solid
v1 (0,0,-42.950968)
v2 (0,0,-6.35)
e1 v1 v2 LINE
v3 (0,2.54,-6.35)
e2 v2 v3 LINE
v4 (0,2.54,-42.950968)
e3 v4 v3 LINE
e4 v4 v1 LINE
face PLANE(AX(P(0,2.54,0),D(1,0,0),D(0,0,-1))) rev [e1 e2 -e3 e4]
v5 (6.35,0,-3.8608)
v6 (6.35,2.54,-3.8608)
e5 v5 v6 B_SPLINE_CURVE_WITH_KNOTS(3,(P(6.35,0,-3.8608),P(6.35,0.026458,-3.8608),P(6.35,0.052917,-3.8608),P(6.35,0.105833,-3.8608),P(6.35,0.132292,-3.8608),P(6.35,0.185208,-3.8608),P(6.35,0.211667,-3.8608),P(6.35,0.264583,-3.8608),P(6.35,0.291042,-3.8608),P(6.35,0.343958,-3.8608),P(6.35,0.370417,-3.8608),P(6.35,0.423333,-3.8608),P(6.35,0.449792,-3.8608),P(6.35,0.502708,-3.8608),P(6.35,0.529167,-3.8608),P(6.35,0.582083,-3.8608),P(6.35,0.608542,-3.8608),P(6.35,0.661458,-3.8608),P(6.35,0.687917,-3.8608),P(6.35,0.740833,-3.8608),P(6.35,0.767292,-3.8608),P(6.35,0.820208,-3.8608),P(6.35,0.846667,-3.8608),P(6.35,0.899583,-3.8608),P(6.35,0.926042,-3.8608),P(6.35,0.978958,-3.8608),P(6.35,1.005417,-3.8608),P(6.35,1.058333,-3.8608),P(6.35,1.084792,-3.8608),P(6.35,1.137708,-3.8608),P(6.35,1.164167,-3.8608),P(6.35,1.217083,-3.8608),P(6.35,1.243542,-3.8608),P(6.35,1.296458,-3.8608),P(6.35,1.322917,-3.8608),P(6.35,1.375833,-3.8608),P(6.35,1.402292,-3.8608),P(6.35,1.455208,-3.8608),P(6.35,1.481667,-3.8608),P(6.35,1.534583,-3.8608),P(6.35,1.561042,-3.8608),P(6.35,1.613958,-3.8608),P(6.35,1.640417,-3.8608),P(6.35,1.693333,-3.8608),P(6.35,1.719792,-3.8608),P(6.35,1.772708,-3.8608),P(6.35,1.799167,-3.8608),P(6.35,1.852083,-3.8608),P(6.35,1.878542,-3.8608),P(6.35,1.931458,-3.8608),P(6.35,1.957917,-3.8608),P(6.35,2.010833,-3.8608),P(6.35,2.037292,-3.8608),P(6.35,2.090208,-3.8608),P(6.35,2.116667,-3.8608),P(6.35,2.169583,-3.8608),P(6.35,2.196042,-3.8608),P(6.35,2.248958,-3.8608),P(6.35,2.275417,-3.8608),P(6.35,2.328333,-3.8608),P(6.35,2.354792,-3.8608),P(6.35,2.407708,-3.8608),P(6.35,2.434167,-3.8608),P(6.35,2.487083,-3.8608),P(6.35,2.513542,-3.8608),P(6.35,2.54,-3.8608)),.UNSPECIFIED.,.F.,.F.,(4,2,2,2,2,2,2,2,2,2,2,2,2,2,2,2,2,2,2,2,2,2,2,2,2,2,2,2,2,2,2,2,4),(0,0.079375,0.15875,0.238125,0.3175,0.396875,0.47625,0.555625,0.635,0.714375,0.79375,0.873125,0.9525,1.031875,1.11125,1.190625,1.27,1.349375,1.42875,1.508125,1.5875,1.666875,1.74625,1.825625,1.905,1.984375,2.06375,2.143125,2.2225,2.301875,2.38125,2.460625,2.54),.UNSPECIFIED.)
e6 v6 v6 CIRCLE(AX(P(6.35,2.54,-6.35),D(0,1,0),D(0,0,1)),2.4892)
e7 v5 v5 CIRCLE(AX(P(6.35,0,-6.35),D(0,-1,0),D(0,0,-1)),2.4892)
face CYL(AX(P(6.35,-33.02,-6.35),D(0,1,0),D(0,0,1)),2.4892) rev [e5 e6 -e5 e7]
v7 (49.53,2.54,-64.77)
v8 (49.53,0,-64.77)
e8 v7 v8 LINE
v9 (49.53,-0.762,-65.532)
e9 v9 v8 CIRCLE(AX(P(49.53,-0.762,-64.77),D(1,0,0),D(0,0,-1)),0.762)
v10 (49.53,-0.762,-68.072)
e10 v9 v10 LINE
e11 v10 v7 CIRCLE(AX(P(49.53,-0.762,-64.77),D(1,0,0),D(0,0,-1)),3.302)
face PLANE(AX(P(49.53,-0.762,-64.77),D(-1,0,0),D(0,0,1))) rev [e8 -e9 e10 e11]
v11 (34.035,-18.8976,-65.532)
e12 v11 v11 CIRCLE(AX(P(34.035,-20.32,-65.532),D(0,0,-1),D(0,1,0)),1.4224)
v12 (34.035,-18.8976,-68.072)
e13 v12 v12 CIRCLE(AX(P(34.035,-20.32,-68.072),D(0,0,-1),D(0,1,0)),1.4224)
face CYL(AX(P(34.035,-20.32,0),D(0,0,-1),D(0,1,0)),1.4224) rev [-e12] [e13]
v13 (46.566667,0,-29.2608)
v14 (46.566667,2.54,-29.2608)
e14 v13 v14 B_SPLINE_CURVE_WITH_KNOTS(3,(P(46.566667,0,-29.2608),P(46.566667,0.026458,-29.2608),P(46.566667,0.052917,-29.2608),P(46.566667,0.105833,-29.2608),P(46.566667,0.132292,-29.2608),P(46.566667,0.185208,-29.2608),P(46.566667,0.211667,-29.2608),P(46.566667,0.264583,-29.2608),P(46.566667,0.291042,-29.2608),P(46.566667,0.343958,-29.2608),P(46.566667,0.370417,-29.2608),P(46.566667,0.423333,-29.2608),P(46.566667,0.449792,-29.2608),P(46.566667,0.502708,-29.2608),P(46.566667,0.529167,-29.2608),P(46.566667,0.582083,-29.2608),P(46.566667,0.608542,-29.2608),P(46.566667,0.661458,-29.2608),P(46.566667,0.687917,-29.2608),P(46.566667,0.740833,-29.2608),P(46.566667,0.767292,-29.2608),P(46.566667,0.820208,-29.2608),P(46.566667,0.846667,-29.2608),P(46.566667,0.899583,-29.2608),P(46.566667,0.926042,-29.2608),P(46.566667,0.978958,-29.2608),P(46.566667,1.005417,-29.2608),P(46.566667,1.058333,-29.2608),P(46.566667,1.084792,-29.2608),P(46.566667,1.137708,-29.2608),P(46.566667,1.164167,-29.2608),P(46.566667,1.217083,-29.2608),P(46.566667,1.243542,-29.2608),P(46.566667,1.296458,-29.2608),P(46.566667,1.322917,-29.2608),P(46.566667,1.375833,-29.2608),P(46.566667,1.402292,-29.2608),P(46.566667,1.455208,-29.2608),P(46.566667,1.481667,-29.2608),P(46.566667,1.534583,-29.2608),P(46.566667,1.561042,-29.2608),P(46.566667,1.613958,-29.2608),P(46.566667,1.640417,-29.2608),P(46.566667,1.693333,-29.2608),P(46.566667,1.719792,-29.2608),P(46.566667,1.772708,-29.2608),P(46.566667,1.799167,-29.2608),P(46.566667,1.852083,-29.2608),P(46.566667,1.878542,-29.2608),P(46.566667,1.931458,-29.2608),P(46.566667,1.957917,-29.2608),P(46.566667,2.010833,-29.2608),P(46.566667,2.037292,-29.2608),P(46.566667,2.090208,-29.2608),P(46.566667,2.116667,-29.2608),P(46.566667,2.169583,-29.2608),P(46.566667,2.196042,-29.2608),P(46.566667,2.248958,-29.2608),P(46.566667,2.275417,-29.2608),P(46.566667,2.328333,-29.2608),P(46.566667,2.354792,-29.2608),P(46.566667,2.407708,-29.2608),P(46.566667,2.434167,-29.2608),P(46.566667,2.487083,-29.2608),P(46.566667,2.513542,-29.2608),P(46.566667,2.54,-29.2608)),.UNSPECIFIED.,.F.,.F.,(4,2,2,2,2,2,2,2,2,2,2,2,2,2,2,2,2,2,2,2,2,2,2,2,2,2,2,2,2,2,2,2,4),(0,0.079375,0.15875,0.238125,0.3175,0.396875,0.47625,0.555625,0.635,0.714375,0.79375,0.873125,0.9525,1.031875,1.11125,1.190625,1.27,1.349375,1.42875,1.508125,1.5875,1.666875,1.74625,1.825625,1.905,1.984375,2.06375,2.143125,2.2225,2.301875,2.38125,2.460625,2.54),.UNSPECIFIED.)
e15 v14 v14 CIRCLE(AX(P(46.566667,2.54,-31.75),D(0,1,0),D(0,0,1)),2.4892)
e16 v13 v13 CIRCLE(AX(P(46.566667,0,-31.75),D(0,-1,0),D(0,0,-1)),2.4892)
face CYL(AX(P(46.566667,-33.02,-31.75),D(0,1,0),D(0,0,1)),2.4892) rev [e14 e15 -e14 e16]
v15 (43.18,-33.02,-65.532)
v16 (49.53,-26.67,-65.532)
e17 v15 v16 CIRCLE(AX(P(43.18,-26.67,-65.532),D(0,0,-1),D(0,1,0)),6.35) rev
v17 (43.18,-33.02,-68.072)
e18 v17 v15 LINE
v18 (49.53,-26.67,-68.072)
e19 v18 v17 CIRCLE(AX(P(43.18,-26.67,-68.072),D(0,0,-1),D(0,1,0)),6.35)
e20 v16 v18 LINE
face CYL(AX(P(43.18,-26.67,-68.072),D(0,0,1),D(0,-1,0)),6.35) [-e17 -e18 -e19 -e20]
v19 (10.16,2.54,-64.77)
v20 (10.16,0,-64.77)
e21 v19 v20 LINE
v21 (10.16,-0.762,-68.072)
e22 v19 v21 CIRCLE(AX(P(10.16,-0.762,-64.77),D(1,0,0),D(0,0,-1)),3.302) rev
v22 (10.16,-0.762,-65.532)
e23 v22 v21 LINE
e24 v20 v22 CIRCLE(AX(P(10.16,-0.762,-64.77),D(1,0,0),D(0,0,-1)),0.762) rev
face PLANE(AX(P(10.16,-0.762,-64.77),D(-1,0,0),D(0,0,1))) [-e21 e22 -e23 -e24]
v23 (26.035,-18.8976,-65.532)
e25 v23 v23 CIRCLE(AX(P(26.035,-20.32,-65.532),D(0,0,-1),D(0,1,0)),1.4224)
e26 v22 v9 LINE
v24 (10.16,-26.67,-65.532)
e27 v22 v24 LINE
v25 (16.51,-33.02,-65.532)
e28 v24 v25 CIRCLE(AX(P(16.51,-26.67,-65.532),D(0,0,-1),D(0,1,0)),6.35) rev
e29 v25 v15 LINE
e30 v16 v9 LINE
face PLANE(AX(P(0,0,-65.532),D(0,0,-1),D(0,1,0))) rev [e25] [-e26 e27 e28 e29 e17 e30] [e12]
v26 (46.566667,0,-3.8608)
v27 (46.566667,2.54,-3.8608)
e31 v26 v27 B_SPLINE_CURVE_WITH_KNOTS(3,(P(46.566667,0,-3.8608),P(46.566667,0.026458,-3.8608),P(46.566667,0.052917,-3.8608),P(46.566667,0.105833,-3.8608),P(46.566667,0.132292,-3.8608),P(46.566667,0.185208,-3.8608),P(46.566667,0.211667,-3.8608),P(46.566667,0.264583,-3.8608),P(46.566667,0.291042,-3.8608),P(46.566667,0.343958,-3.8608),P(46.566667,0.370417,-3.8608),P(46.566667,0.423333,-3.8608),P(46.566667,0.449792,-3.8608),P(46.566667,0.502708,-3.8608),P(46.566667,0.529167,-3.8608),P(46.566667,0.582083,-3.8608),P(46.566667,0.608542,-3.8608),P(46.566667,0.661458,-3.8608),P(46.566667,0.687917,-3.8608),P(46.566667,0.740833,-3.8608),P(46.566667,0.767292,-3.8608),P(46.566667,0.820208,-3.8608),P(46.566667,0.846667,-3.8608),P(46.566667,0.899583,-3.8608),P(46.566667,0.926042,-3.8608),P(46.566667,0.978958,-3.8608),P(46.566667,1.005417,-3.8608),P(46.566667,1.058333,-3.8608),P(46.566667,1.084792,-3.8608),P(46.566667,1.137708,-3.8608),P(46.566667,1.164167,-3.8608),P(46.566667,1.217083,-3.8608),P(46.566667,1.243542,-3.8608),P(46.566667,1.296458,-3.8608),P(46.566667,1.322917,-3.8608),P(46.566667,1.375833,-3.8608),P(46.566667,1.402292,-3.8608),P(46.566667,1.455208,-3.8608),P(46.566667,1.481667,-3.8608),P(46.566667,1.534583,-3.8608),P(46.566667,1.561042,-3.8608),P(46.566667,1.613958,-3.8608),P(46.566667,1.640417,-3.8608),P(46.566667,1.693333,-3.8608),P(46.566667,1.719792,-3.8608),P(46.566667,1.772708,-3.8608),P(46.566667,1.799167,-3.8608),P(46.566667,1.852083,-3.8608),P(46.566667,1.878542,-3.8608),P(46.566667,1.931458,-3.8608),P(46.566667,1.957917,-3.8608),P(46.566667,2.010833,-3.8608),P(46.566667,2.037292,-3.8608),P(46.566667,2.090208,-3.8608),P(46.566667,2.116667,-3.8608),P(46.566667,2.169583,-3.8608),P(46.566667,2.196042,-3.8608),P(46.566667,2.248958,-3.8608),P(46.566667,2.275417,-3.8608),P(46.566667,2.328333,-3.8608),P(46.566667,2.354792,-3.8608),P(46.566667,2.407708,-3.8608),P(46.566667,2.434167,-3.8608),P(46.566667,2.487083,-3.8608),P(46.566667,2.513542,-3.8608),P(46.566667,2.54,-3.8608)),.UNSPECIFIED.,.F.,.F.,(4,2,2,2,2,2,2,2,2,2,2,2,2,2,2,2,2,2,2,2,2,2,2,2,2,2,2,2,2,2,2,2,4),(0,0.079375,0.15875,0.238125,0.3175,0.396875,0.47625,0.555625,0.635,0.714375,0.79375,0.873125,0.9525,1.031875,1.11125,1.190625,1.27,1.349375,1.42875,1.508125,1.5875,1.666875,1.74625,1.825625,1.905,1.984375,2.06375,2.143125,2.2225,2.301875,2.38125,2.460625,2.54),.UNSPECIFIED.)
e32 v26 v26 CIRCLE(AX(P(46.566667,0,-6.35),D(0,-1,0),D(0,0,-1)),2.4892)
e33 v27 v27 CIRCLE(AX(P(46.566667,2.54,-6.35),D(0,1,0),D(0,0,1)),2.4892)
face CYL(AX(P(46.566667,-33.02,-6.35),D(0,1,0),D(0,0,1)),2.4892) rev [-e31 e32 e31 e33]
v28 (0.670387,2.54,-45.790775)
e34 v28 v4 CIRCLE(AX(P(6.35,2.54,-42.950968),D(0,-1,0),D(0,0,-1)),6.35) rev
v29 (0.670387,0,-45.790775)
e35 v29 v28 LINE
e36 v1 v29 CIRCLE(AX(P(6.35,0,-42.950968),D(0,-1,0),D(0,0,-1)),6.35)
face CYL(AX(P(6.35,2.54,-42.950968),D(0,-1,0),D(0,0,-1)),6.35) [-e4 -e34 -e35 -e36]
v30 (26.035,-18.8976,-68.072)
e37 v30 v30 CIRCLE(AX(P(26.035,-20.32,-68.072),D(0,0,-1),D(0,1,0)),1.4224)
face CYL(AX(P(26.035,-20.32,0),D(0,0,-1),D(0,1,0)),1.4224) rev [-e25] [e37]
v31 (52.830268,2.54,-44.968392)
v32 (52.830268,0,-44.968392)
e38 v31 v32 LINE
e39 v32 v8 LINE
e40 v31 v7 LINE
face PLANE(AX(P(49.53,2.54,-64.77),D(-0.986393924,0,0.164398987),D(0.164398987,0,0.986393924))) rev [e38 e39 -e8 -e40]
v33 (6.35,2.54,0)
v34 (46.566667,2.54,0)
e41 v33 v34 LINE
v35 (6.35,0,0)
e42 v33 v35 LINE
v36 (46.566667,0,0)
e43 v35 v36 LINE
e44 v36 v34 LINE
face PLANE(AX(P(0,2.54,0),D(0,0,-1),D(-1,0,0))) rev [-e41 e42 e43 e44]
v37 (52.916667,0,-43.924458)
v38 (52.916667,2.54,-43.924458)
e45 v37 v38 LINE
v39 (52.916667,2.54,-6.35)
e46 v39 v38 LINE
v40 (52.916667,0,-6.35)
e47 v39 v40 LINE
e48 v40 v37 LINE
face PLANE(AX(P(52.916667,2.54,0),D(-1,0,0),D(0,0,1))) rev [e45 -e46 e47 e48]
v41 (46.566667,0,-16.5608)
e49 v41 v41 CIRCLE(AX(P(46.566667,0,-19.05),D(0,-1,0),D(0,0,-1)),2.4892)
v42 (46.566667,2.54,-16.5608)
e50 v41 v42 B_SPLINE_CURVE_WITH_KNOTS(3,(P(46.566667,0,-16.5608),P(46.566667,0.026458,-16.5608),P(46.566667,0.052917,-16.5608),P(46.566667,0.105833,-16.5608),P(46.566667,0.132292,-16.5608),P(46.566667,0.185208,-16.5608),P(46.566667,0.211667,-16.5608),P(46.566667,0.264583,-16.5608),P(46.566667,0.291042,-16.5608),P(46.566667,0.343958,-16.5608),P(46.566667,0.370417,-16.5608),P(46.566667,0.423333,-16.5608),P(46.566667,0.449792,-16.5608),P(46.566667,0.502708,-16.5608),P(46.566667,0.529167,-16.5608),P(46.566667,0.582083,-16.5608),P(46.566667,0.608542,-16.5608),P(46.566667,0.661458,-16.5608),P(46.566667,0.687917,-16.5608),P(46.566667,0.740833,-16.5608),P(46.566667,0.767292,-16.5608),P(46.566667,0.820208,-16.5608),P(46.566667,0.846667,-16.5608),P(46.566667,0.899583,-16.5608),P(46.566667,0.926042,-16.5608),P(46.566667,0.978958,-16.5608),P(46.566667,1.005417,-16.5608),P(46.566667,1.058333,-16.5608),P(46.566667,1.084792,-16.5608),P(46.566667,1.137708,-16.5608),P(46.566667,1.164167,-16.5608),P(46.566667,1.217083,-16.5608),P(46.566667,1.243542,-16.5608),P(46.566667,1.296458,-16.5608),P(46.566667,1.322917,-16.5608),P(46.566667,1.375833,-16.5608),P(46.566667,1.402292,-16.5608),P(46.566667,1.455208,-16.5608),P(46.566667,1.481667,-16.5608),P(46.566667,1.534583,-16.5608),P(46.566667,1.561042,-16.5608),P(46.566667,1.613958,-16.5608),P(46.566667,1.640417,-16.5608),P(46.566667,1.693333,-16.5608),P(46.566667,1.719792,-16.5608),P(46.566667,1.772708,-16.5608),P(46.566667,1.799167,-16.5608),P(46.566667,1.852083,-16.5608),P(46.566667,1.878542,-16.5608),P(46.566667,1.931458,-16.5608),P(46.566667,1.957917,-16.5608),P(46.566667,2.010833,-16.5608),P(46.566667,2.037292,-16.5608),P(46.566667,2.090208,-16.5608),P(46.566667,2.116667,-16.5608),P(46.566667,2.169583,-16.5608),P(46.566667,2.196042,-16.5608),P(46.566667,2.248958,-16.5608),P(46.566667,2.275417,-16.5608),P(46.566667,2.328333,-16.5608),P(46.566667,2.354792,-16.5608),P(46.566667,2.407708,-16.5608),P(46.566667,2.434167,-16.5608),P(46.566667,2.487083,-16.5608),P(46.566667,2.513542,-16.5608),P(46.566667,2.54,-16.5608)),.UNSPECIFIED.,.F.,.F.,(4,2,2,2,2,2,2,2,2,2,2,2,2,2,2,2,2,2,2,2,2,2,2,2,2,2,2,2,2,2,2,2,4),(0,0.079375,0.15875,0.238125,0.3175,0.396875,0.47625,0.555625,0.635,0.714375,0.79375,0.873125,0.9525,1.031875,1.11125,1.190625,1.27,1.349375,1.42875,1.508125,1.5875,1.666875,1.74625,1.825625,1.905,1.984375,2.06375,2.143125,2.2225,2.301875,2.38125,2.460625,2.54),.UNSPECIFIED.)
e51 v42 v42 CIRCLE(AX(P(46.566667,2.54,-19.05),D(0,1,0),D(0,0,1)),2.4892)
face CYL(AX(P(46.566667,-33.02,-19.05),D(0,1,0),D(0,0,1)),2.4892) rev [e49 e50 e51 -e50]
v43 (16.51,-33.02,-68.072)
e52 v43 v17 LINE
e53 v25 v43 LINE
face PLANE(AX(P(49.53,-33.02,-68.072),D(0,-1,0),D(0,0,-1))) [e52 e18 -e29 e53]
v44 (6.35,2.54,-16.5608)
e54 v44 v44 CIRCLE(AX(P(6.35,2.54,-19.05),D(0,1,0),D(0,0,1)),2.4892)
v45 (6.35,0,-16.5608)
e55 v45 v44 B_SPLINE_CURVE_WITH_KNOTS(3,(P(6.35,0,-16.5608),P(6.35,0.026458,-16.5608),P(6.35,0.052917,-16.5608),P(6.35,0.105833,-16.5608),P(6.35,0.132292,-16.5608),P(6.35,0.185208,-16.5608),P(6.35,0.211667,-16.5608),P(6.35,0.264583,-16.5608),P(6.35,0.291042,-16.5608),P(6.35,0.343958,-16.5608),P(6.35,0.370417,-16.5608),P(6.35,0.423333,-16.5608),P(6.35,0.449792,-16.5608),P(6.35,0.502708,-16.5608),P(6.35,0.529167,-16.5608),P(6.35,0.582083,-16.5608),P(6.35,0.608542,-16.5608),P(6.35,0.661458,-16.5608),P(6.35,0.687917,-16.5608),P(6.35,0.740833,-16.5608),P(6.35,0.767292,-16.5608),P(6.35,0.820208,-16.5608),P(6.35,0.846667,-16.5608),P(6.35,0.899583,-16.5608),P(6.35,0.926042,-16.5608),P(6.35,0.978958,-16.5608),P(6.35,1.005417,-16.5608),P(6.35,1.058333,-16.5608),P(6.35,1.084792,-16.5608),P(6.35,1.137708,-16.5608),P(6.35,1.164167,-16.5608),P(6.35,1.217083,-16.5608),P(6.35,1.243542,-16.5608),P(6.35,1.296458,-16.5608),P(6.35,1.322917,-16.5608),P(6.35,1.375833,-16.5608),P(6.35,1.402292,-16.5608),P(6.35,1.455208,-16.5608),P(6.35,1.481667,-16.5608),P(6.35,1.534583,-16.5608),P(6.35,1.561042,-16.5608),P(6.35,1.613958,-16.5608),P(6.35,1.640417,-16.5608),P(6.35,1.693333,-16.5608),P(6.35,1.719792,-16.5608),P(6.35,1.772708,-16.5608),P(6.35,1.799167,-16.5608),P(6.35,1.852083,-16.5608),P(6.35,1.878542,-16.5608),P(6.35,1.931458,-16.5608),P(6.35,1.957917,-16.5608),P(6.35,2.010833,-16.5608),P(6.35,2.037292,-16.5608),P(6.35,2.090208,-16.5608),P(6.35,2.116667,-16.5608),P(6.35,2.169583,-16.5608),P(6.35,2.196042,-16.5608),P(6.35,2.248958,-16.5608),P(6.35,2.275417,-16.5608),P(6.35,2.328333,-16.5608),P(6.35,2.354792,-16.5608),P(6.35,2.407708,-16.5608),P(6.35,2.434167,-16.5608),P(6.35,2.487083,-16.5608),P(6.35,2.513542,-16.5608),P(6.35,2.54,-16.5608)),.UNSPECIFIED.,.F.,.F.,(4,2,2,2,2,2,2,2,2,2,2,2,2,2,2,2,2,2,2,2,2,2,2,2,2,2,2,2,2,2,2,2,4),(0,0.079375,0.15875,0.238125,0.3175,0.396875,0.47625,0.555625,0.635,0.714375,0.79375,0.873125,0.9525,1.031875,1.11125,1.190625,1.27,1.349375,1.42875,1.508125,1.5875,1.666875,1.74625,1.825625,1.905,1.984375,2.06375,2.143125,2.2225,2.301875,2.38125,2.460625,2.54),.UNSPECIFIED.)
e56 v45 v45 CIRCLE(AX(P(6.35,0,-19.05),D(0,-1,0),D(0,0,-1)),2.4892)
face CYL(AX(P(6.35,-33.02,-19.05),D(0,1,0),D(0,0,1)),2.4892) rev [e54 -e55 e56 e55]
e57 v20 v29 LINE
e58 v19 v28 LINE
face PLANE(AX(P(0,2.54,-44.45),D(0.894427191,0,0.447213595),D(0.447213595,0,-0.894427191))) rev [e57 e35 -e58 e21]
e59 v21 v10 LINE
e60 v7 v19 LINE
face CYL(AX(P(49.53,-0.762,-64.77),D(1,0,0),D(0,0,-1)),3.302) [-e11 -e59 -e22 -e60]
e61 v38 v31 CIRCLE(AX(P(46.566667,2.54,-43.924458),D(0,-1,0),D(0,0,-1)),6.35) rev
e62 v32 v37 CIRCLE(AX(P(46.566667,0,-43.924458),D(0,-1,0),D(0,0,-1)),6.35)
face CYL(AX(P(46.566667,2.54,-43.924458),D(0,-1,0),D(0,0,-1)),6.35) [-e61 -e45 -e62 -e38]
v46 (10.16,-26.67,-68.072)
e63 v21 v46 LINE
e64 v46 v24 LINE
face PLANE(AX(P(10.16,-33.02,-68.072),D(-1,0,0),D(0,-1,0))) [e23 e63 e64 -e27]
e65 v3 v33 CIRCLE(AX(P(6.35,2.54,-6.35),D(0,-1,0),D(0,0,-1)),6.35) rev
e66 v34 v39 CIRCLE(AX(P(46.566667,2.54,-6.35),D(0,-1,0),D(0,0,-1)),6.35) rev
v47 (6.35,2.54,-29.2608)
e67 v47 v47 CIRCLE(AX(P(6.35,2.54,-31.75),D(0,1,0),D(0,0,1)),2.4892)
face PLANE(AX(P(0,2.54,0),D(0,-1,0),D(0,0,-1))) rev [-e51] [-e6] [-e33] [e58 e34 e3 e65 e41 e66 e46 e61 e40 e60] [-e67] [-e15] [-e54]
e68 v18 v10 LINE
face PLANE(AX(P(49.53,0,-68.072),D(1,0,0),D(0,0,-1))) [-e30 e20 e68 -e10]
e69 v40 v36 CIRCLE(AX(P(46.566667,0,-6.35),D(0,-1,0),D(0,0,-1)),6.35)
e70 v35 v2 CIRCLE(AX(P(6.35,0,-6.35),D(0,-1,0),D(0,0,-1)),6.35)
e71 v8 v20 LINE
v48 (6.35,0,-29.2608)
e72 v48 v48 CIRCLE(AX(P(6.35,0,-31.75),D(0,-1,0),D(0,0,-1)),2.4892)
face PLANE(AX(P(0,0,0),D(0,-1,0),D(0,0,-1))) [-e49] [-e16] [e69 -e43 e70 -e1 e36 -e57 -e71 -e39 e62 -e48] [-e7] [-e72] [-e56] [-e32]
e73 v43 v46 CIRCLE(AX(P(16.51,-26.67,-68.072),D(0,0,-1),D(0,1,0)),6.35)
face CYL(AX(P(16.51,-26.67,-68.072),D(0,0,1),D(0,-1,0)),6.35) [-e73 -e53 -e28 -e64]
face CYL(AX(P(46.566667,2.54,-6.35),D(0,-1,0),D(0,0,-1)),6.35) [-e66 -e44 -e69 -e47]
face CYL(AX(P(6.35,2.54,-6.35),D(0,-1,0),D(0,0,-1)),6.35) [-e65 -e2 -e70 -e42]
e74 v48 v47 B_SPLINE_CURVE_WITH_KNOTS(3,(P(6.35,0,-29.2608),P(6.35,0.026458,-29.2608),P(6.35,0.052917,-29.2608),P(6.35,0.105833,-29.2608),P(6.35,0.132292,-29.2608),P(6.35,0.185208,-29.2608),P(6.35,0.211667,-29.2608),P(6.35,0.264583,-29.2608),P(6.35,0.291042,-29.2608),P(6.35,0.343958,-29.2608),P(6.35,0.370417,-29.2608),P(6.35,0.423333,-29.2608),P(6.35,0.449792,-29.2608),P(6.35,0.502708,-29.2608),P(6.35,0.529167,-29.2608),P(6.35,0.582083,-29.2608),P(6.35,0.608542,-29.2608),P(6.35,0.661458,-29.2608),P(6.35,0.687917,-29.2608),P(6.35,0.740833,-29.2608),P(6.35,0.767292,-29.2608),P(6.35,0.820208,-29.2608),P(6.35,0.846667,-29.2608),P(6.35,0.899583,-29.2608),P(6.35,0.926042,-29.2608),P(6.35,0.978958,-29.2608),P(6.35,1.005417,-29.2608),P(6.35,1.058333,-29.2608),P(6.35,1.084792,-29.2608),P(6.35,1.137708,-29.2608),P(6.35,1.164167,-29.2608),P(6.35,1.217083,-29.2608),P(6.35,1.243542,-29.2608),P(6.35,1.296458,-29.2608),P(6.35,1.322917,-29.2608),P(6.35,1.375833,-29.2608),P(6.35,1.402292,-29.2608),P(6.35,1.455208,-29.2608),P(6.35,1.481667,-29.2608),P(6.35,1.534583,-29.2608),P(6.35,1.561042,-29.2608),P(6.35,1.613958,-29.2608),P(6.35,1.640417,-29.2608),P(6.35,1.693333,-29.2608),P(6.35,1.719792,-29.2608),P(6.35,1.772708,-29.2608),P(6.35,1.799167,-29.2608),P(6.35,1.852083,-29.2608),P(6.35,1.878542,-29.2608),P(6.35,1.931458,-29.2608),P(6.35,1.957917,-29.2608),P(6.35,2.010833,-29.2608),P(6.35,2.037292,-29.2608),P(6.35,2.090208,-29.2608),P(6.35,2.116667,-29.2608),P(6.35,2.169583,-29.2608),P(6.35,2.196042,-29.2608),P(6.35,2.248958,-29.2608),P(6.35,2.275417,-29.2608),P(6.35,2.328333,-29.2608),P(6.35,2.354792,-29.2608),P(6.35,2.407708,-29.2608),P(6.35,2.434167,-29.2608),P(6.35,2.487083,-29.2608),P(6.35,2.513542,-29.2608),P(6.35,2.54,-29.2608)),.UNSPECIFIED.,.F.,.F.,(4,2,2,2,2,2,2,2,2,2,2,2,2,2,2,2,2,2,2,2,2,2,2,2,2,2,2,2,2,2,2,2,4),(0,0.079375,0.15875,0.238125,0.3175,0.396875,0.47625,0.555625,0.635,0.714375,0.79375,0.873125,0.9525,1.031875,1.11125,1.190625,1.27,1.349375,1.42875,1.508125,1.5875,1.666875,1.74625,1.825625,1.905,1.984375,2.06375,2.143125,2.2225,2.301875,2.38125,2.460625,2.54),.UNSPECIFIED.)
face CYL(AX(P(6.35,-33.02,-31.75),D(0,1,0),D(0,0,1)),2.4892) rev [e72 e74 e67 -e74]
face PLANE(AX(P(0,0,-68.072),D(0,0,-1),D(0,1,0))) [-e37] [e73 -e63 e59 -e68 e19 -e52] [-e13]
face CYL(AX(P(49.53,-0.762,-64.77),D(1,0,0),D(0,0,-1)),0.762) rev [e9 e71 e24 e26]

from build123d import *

# Parameters (mm, degrees)
SKETCH1_R           = 2.4892
SKETCH1_R_2         = 1.4224
BOSS_EXTRUDE1_DEPTH = 3.175
BASE_FLANGE1_DEPTH  = 2.54
EDGE_FLANGE1_START  = 10.16
EDGE_FLANGE1_DEPTH  = 39.37
SKETCH10_R          = 2.4892
CUT_EXTRUDE1_DEPTH  = 115.617842028
SKETCH11_R          = 1.4224
CUT_EXTRUDE2_DEPTH  = 93.32708809
FILLET1_R           = 6.35


# Read off the part's stored shape, not the designer's step: Edge-Flange1
# Sheet-metal steps are written as plain solids
with BuildPart() as part:
    # Sketch1 → Boss-Extrude1 (new body)
    with BuildSketch(Plane(origin=(0, 0, 0), x_dir=(1, 0, 0), z_dir=(0, 1, 0))):
        Polygon((0, 0), (52.916666667, 0), (52.916666667, 44.45), (44.45, 95.25), (25.4, 95.25), (0, 44.45), align=None)
        with Locations(Location((6.35, 6.35, 0), (0, 0, 270))):
            Circle(SKETCH1_R, mode=Mode.SUBTRACT)
        with Locations(Location((6.35, 19.05, 0), (0, 0, 270))):
            Circle(SKETCH1_R, mode=Mode.SUBTRACT)
        with Locations(Location((6.35, 31.75, 0), (0, 0, 270))):
            Circle(SKETCH1_R, mode=Mode.SUBTRACT)
        with Locations(Location((46.566666667, 6.35, 0), (0, 0, 270))):
            Circle(SKETCH1_R, mode=Mode.SUBTRACT)
        with Locations(Location((46.566666667, 19.05, 0), (0, 0, 270))):
            Circle(SKETCH1_R, mode=Mode.SUBTRACT)
        with Locations(Location((46.566666667, 31.75, 0), (0, 0, 270))):
            Circle(SKETCH1_R, mode=Mode.SUBTRACT)
        with Locations(Location((31.75508, 82.56016, 0), (0, 0, 270))):
            Circle(SKETCH1_R_2, mode=Mode.SUBTRACT)
        with Locations(Location((39.755080002, 82.56016, 0), (0, 0, 270))):
            Circle(SKETCH1_R_2, mode=Mode.SUBTRACT)
    extrude(amount=BOSS_EXTRUDE1_DEPTH)


with BuildPart() as body_2:
    # Sketch2 → Base-Flange1 (new body)
    with BuildSketch(Plane(origin=(0, 0, 0), x_dir=(1, 0, 0), z_dir=(0, 1, 0))):
        Polygon((0, 0), (52.916666667, 0), (52.916666667, 44.45), (49.53, 64.77), (10.16, 64.77), (0, 44.45), align=None)
    extrude(amount=BASE_FLANGE1_DEPTH)

    # Edge-Flange1 outline → Edge-Flange1 (add)
    with BuildSketch(Plane.YZ.offset(EDGE_FLANGE1_START)):
        with BuildLine():
            Line((-33.02, -68.072), (-0.762, -68.072))
            ThreePointArc((-0.762, -68.072), (1.572866591, -67.104866591), (2.54, -64.77))
            Line((2.54, -64.77), (0, -64.77))
            ThreePointArc((0, -64.77), (-0.223184633, -65.308815367), (-0.762, -65.532))
            Line((-0.762, -65.532), (-33.02, -65.532))
            Line((-33.02, -65.532), (-33.02, -68.072))
        make_face()
    extrude(amount=EDGE_FLANGE1_DEPTH)

    # Sketch10 → Cut-Extrude1 (cut, through all)
    with BuildSketch(Plane(origin=(0, 2.54, 0), x_dir=(1, 0, 0), z_dir=(0, 1, 0))):
        with Locations(Location((46.566666667, 31.75, 0), (0, 0, 270))):
            Circle(SKETCH10_R)
        with Locations(Location((46.566666667, 19.05, 0), (0, 0, 270))):
            Circle(SKETCH10_R)
        with Locations(Location((46.566666667, 6.35, 0), (0, 0, 270))):
            Circle(SKETCH10_R)
        with Locations(Location((6.35, 6.35, 0), (0, 0, 270))):
            Circle(SKETCH10_R)
        with Locations(Location((6.35, 19.05, 0), (0, 0, 270))):
            Circle(SKETCH10_R)
        with Locations(Location((6.35, 31.75, 0), (0, 0, 270))):
            Circle(SKETCH10_R)
    extrude(amount=-CUT_EXTRUDE1_DEPTH, mode=Mode.SUBTRACT)

    # Sketch11 → Cut-Extrude2 (cut, through all)
    with BuildSketch(Plane(origin=(0, 0, -68.072), x_dir=(-1, 0, 0), z_dir=(0, 0, -1))):
        with Locations(Location((-34.035000002, -20.32, 0), (0, 0, 90))):
            Circle(SKETCH11_R)
        with Locations(Location((-26.035, -20.32, 0), (0, 0, 90))):
            Circle(SKETCH11_R)
    extrude(amount=-CUT_EXTRUDE2_DEPTH, mode=Mode.SUBTRACT)

    # Fillet1
    fillet1_edges = [body_2.edges().sort_by_distance(p)[0] for p in [
        (0, 1.27, -44.45),
        (52.916666667, 1.27, -44.45),
        (52.916666667, 1.27, 0),
        (0, 1.27, 0),
        (10.16, -33.02, -66.802),
        (49.53, -33.02, -66.802),
    ]]
    fillet(fillet1_edges, radius=FILLET1_R)


solid = body_2.part
